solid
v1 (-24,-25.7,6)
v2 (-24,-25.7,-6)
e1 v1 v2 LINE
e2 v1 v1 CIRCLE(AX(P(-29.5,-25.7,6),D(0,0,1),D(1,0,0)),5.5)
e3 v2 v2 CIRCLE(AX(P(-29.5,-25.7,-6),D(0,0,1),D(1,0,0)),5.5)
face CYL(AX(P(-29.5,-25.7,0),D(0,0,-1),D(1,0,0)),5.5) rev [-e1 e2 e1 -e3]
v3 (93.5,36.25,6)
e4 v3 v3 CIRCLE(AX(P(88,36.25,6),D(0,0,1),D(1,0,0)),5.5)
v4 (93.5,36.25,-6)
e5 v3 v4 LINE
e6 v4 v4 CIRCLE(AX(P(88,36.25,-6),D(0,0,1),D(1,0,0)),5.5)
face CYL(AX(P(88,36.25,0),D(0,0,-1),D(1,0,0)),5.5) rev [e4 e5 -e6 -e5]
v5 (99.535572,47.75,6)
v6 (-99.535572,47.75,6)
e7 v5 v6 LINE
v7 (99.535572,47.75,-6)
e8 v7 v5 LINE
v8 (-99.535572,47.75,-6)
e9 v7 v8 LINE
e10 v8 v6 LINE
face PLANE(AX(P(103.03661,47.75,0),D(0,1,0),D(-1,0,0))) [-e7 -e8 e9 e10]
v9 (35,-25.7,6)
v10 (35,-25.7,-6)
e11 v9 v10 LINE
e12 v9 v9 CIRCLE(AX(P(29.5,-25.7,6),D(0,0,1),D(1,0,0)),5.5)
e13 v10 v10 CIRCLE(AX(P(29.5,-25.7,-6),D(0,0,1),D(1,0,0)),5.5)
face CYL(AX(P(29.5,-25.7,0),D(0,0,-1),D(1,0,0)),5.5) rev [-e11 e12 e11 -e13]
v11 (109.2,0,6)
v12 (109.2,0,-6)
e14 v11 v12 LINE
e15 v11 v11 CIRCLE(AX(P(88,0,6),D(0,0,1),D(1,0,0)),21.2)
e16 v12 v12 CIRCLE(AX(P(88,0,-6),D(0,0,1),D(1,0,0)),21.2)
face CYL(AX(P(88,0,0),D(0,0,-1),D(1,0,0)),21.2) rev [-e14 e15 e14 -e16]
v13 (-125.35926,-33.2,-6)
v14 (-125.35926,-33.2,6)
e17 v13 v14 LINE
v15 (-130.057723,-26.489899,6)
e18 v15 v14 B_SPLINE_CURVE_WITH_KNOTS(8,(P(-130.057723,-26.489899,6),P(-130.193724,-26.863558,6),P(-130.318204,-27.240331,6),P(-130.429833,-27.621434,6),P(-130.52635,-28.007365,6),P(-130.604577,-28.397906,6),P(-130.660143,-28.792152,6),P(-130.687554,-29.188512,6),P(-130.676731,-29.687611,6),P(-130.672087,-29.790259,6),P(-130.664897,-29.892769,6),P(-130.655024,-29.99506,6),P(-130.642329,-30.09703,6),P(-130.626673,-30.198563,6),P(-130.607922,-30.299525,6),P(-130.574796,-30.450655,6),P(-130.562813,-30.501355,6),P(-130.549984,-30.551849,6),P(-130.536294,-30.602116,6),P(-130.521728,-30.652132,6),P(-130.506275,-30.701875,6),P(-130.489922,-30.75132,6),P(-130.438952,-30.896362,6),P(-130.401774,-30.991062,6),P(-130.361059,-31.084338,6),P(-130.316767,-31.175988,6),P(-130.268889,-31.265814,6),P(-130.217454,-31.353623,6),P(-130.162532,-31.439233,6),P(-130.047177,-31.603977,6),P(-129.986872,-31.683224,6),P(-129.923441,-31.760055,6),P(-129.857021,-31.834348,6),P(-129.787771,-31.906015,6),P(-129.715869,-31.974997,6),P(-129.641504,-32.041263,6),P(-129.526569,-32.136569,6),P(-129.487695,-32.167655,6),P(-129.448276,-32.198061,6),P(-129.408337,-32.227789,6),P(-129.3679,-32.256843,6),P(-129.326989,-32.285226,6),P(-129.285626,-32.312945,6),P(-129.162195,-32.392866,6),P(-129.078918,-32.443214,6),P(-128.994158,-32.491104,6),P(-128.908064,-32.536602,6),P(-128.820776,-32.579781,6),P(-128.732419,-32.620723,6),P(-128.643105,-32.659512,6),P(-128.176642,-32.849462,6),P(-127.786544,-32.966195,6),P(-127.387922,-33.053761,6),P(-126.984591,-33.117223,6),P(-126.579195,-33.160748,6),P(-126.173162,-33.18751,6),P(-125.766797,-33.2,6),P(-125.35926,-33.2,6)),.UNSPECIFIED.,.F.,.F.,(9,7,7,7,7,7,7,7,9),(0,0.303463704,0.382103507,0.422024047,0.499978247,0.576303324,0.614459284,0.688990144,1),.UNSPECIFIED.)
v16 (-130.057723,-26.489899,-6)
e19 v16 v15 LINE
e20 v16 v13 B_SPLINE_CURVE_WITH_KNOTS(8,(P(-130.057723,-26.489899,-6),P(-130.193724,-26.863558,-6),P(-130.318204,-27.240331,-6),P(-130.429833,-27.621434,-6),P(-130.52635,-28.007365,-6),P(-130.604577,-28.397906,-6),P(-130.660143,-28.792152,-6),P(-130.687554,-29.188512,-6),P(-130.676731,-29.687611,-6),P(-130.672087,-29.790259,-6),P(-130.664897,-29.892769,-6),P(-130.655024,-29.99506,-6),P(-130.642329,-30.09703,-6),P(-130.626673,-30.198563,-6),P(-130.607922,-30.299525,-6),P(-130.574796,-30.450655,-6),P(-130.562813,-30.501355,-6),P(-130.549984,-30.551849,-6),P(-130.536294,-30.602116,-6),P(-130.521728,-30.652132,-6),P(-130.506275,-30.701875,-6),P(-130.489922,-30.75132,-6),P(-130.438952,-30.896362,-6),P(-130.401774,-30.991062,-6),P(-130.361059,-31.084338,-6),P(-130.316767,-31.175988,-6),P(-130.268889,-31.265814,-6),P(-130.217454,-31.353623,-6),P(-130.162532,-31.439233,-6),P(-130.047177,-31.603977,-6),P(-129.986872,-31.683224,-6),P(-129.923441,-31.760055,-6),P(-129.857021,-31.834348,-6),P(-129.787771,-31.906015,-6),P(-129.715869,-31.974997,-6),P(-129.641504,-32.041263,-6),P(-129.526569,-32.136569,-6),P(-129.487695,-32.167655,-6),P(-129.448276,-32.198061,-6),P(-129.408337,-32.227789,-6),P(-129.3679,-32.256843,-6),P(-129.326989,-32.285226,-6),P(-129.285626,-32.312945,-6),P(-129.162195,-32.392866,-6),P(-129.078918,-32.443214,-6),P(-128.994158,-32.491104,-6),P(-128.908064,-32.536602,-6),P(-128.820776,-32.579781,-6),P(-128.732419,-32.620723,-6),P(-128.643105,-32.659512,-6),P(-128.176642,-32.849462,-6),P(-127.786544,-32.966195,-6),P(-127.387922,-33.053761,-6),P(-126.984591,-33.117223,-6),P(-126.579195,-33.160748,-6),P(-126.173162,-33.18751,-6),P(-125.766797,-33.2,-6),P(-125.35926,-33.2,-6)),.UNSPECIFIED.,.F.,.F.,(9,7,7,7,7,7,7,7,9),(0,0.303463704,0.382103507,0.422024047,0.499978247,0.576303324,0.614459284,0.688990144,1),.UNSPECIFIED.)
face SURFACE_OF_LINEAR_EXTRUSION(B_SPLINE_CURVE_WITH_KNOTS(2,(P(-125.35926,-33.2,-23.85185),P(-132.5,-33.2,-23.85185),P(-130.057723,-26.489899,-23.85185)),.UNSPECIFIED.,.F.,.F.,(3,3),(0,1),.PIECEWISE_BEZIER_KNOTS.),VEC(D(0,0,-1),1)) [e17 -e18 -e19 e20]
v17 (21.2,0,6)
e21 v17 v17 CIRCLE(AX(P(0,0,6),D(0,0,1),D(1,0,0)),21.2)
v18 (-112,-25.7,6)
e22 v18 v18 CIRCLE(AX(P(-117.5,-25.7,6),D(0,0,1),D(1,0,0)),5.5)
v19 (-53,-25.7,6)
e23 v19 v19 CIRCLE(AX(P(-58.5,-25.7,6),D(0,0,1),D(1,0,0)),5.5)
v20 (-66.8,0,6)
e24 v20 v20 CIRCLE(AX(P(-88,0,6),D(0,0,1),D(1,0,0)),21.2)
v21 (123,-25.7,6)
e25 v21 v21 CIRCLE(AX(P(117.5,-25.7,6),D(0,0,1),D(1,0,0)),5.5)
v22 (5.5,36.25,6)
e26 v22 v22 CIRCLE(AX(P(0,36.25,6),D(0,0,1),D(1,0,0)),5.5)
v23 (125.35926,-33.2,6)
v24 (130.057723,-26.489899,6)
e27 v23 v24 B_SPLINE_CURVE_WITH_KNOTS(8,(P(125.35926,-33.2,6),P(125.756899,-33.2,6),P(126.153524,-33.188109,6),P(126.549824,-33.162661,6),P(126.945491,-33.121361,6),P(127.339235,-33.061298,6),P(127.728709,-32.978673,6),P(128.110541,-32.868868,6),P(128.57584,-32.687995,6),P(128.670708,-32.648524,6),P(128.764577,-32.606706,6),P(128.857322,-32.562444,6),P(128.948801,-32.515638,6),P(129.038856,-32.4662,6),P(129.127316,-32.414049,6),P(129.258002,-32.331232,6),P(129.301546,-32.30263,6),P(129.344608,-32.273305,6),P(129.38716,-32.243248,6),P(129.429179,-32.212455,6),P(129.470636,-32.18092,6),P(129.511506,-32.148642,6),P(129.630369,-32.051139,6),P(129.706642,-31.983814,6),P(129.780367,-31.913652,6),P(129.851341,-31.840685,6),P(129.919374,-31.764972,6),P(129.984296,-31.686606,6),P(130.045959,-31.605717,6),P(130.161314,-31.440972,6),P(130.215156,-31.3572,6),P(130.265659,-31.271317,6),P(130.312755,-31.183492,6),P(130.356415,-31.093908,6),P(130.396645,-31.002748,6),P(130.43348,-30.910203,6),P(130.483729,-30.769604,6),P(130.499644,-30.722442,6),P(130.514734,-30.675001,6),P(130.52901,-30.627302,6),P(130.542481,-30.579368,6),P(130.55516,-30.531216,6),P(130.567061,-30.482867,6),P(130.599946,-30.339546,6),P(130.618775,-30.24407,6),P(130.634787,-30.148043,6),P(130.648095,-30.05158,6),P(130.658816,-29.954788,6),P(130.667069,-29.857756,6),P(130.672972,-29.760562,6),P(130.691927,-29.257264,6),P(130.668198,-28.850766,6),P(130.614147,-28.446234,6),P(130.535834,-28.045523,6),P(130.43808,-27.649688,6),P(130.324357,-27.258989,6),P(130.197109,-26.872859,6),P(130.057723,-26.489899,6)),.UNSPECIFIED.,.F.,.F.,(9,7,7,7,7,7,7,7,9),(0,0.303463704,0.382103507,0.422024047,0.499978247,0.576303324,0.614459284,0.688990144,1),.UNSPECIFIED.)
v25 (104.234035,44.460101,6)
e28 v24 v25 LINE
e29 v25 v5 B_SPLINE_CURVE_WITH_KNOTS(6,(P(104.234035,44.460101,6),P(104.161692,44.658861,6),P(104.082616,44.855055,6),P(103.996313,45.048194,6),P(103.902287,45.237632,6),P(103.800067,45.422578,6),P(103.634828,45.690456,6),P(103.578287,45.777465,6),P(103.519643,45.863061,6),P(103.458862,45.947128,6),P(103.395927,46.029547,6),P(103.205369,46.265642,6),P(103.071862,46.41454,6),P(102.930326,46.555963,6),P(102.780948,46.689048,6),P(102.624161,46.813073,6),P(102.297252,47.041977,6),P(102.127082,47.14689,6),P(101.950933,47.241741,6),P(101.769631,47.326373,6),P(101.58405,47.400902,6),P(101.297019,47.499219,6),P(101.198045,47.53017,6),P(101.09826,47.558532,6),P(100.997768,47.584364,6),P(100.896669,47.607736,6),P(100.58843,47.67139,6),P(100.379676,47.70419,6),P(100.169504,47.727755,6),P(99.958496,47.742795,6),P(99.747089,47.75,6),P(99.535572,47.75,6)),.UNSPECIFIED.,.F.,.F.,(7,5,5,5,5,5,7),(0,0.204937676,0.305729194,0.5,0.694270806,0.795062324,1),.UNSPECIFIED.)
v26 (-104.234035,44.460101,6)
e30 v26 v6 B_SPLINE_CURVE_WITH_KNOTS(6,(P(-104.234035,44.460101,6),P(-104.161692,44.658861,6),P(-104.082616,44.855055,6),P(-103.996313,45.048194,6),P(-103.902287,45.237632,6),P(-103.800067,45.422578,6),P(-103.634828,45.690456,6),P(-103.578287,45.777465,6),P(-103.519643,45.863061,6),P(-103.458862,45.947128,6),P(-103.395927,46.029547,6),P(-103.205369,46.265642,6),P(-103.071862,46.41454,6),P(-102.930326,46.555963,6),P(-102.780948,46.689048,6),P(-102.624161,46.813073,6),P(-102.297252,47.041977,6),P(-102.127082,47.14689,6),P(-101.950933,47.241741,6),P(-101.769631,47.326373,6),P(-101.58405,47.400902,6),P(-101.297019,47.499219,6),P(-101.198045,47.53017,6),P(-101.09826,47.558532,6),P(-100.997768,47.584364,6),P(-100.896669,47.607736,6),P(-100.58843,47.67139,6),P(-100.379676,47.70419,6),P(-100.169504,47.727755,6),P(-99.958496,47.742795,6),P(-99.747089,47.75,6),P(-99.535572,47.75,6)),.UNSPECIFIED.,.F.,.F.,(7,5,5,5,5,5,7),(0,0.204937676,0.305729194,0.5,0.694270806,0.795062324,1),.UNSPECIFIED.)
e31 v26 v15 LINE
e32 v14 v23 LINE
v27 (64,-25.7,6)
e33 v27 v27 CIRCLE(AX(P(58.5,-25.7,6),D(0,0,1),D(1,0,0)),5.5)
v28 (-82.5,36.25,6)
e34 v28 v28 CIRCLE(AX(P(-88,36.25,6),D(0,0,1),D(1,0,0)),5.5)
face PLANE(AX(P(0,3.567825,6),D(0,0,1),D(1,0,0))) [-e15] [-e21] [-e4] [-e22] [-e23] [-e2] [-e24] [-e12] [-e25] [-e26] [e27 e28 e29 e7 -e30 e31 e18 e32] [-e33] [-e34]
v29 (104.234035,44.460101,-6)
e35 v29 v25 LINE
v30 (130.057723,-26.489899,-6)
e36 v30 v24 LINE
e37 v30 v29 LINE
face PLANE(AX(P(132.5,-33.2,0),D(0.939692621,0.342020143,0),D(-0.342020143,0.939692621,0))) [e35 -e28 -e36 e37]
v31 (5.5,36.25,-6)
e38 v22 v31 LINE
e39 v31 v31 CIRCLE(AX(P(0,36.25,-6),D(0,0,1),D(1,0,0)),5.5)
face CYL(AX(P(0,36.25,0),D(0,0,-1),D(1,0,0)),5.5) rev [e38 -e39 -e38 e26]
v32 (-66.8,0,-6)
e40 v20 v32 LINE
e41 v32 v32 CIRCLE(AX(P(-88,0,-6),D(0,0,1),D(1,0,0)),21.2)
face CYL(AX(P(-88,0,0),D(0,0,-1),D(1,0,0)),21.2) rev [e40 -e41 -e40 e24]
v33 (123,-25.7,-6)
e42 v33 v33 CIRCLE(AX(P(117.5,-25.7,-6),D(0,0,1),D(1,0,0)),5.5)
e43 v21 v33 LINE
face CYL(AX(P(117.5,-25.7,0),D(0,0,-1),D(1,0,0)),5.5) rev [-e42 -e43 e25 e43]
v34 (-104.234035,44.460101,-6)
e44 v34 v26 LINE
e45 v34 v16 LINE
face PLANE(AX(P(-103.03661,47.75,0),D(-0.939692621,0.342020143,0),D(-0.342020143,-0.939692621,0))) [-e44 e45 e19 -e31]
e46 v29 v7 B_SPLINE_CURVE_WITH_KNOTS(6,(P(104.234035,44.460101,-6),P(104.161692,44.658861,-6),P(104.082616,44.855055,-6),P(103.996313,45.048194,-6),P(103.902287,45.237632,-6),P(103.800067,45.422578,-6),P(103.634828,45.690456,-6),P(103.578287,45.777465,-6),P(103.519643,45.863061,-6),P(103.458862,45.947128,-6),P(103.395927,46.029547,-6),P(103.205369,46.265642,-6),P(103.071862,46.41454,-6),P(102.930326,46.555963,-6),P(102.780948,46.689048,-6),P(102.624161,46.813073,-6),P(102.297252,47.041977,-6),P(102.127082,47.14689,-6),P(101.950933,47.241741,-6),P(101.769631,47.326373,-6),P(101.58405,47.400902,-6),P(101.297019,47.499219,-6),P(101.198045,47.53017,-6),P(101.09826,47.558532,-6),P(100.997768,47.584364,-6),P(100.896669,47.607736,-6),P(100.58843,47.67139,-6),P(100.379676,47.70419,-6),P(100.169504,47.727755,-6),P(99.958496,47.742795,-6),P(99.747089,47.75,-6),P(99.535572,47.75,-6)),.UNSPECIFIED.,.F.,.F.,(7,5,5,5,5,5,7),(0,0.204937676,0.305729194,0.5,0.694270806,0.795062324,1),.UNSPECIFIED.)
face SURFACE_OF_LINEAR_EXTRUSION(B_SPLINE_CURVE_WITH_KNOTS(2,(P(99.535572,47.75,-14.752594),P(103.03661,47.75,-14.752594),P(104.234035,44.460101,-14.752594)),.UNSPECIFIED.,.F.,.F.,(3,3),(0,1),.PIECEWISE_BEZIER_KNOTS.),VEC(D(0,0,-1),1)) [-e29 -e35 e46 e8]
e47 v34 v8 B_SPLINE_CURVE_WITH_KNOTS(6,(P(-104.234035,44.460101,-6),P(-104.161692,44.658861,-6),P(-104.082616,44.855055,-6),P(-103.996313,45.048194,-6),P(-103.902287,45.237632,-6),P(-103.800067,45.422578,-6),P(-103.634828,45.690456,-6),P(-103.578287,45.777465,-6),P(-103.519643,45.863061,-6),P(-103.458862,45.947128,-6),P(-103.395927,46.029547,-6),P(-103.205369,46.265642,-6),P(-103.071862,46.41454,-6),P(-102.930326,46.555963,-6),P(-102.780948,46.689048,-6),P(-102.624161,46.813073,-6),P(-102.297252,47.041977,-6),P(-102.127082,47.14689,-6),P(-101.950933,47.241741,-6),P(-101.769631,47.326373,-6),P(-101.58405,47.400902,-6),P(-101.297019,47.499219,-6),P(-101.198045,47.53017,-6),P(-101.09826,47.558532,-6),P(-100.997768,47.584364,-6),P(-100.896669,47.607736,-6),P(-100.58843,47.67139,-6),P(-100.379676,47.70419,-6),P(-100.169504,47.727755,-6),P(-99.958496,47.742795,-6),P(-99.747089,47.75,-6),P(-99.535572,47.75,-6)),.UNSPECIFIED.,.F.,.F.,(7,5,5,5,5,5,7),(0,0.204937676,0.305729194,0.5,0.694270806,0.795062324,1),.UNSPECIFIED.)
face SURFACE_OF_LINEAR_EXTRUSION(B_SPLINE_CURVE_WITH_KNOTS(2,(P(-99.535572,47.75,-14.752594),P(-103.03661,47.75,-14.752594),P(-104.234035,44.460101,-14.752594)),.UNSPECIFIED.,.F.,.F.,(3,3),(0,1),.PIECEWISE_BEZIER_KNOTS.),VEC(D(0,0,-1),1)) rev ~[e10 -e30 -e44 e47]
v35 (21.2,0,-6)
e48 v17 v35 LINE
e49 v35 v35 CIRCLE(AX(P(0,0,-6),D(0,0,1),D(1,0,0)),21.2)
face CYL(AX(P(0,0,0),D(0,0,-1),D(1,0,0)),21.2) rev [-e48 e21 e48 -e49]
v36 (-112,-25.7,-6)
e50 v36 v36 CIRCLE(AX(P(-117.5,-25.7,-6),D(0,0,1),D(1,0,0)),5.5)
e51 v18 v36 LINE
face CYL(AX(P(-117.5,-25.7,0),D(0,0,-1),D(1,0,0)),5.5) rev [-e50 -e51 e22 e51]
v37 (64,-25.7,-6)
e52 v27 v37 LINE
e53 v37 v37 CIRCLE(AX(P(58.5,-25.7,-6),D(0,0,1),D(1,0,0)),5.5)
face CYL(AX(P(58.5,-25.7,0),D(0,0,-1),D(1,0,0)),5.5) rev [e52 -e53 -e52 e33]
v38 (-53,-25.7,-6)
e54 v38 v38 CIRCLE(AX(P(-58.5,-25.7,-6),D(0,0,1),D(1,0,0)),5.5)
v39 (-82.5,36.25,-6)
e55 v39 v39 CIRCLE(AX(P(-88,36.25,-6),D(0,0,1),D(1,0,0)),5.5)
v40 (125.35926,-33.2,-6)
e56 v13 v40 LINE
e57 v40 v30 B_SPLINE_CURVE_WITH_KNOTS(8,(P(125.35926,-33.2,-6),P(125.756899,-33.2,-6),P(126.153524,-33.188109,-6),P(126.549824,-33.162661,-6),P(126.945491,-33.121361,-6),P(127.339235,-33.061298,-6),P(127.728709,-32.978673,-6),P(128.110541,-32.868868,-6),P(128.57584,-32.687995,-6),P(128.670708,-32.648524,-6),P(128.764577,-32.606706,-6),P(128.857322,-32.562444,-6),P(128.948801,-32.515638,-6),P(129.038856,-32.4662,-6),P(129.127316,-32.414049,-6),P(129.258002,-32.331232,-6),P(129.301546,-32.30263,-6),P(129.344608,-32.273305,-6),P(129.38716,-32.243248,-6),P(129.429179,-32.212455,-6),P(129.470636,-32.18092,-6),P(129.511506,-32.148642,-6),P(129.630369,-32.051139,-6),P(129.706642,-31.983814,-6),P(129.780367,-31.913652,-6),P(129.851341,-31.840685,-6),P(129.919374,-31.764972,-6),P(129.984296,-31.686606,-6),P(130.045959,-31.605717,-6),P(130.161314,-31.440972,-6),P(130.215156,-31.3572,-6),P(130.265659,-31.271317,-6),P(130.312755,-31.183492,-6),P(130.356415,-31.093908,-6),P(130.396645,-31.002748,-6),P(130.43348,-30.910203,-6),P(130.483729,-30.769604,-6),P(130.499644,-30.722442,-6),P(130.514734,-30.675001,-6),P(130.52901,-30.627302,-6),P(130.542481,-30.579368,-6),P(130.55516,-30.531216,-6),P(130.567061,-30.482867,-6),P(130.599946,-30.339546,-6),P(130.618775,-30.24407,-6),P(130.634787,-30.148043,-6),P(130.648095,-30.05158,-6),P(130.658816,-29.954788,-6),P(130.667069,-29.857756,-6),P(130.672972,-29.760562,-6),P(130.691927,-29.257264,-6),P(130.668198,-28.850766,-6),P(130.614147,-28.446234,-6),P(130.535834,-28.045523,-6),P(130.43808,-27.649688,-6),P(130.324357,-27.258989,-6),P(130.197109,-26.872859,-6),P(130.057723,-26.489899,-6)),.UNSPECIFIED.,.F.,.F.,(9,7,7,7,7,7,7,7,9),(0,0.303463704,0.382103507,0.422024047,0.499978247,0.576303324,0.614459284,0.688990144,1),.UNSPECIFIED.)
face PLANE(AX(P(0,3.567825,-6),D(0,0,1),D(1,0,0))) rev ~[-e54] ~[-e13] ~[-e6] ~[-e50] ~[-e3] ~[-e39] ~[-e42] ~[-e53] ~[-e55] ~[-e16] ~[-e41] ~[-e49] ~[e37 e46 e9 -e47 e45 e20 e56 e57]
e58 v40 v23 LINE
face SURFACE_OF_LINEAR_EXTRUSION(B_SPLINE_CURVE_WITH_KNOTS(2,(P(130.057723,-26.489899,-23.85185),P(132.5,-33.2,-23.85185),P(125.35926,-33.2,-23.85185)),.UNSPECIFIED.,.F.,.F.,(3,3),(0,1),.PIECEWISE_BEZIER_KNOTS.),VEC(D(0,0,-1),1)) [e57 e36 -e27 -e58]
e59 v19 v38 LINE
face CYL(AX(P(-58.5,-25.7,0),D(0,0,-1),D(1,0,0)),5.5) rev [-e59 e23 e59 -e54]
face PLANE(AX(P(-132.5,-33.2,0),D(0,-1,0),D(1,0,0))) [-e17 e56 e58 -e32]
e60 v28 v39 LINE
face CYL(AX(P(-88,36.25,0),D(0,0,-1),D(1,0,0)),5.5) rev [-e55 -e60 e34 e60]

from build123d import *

# Parameters (mm, degrees)
F0_R        = 5.5
F0_R_2      = 21.2
F1_DEPTH    = 6
F2_T1_DEPTH = 47.7037001686
F2_T3_DEPTH = 29.5051884552


# Not quite as in the source:
# - a fillet or chamfer that OpenCascade refuses, or shapes differently, is made with other operations: its cross-section is extruded or revolved along the edge and cut away or added


with BuildPart() as f1:
    # F0 (on Top) → F1 (new body, symmetric)
    with BuildSketch(Plane.XY):
        Polygon((103.0366095362, 47.75), (-103.0366095362, 47.75), (-132.5, -33.2), (0, -33.2), (132.5, -33.2), align=None)
        with Locations((-117.5, -25.7)):
            Circle(F0_R, mode=Mode.SUBTRACT)
        with Locations((-58.5, -25.7)):
            Circle(F0_R, mode=Mode.SUBTRACT)
        with Locations((-29.5, -25.7)):
            Circle(F0_R, mode=Mode.SUBTRACT)
        with Locations((-88, 0)):
            Circle(F0_R_2, mode=Mode.SUBTRACT)
        with Locations((29.5, -25.7)):
            Circle(F0_R, mode=Mode.SUBTRACT)
        with Locations((58.5, -25.7)):
            Circle(F0_R, mode=Mode.SUBTRACT)
        with Locations((117.5, -25.7)):
            Circle(F0_R, mode=Mode.SUBTRACT)
        Circle(F0_R_2, mode=Mode.SUBTRACT)
        with Locations((88, 0)):
            Circle(F0_R_2, mode=Mode.SUBTRACT)
        with Locations((-88, 36.25)):
            Circle(F0_R, mode=Mode.SUBTRACT)
        with Locations((0, 36.25)):
            Circle(F0_R, mode=Mode.SUBTRACT)
        with Locations((88, 36.25)):
            Circle(F0_R, mode=Mode.SUBTRACT)
    extrude(amount=F1_DEPTH, both=True)

    # F2: fillet of radius 5 on 4 edges, made by hand

    # F2_s2 → F2_t1 (cut)
    with BuildSketch(Plane.XY.offset(-23.8518500843)):
        with BuildLine():
            add(Edge.make_bspline(
                [(-125.3592599663, -33.2), (-132.5, -33.2), (-130.0577230702, -26.4898992834)],
                knots=[0, 0, 0, 1, 1, 1], degree=2, weights=[1, 1, 1]))
            Line((-130.0577230702, -26.4898992834), (-132.5, -33.2))
            Line((-132.5, -33.2), (-125.3592599663, -33.2))
        make_face()
        with BuildLine():
            add(Edge.make_bspline(
                [(130.0577230702, -26.4898992834), (132.5, -33.2), (125.3592599663, -33.2)],
                knots=[0, 0, 0, 1, 1, 1], degree=2, weights=[1, 1, 1]))
            Line((125.3592599663, -33.2), (132.5, -33.2))
            Line((132.5, -33.2), (130.0577230702, -26.4898992834))
        make_face()
    extrude(amount=F2_T1_DEPTH, mode=Mode.SUBTRACT)

    # F2_s4 → F2_t3 (cut)
    with BuildSketch(Plane.XY.offset(-14.7525942276)):
        with BuildLine():
            add(Edge.make_bspline(
                [(-99.5355718451, 47.75), (-103.0366095362, 47.75), (-104.234034949, 44.4601007166)],
                knots=[0, 0, 0, 1, 1, 1], degree=2, weights=[1, 1, 1]))
            Line((-104.234034949, 44.4601007166), (-103.0366095362, 47.75))
            Line((-103.0366095362, 47.75), (-99.5355718451, 47.75))
        make_face()
        with BuildLine():
            add(Edge.make_bspline(
                [(99.5355718451, 47.75), (103.0366095362, 47.75), (104.234034949, 44.4601007166)],
                knots=[0, 0, 0, 1, 1, 1], degree=2, weights=[1, 1, 1]))
            Line((104.234034949, 44.4601007166), (103.0366095362, 47.75))
            Line((103.0366095362, 47.75), (99.5355718451, 47.75))
        make_face()
    extrude(amount=F2_T3_DEPTH, mode=Mode.SUBTRACT)


solid = f1.part
